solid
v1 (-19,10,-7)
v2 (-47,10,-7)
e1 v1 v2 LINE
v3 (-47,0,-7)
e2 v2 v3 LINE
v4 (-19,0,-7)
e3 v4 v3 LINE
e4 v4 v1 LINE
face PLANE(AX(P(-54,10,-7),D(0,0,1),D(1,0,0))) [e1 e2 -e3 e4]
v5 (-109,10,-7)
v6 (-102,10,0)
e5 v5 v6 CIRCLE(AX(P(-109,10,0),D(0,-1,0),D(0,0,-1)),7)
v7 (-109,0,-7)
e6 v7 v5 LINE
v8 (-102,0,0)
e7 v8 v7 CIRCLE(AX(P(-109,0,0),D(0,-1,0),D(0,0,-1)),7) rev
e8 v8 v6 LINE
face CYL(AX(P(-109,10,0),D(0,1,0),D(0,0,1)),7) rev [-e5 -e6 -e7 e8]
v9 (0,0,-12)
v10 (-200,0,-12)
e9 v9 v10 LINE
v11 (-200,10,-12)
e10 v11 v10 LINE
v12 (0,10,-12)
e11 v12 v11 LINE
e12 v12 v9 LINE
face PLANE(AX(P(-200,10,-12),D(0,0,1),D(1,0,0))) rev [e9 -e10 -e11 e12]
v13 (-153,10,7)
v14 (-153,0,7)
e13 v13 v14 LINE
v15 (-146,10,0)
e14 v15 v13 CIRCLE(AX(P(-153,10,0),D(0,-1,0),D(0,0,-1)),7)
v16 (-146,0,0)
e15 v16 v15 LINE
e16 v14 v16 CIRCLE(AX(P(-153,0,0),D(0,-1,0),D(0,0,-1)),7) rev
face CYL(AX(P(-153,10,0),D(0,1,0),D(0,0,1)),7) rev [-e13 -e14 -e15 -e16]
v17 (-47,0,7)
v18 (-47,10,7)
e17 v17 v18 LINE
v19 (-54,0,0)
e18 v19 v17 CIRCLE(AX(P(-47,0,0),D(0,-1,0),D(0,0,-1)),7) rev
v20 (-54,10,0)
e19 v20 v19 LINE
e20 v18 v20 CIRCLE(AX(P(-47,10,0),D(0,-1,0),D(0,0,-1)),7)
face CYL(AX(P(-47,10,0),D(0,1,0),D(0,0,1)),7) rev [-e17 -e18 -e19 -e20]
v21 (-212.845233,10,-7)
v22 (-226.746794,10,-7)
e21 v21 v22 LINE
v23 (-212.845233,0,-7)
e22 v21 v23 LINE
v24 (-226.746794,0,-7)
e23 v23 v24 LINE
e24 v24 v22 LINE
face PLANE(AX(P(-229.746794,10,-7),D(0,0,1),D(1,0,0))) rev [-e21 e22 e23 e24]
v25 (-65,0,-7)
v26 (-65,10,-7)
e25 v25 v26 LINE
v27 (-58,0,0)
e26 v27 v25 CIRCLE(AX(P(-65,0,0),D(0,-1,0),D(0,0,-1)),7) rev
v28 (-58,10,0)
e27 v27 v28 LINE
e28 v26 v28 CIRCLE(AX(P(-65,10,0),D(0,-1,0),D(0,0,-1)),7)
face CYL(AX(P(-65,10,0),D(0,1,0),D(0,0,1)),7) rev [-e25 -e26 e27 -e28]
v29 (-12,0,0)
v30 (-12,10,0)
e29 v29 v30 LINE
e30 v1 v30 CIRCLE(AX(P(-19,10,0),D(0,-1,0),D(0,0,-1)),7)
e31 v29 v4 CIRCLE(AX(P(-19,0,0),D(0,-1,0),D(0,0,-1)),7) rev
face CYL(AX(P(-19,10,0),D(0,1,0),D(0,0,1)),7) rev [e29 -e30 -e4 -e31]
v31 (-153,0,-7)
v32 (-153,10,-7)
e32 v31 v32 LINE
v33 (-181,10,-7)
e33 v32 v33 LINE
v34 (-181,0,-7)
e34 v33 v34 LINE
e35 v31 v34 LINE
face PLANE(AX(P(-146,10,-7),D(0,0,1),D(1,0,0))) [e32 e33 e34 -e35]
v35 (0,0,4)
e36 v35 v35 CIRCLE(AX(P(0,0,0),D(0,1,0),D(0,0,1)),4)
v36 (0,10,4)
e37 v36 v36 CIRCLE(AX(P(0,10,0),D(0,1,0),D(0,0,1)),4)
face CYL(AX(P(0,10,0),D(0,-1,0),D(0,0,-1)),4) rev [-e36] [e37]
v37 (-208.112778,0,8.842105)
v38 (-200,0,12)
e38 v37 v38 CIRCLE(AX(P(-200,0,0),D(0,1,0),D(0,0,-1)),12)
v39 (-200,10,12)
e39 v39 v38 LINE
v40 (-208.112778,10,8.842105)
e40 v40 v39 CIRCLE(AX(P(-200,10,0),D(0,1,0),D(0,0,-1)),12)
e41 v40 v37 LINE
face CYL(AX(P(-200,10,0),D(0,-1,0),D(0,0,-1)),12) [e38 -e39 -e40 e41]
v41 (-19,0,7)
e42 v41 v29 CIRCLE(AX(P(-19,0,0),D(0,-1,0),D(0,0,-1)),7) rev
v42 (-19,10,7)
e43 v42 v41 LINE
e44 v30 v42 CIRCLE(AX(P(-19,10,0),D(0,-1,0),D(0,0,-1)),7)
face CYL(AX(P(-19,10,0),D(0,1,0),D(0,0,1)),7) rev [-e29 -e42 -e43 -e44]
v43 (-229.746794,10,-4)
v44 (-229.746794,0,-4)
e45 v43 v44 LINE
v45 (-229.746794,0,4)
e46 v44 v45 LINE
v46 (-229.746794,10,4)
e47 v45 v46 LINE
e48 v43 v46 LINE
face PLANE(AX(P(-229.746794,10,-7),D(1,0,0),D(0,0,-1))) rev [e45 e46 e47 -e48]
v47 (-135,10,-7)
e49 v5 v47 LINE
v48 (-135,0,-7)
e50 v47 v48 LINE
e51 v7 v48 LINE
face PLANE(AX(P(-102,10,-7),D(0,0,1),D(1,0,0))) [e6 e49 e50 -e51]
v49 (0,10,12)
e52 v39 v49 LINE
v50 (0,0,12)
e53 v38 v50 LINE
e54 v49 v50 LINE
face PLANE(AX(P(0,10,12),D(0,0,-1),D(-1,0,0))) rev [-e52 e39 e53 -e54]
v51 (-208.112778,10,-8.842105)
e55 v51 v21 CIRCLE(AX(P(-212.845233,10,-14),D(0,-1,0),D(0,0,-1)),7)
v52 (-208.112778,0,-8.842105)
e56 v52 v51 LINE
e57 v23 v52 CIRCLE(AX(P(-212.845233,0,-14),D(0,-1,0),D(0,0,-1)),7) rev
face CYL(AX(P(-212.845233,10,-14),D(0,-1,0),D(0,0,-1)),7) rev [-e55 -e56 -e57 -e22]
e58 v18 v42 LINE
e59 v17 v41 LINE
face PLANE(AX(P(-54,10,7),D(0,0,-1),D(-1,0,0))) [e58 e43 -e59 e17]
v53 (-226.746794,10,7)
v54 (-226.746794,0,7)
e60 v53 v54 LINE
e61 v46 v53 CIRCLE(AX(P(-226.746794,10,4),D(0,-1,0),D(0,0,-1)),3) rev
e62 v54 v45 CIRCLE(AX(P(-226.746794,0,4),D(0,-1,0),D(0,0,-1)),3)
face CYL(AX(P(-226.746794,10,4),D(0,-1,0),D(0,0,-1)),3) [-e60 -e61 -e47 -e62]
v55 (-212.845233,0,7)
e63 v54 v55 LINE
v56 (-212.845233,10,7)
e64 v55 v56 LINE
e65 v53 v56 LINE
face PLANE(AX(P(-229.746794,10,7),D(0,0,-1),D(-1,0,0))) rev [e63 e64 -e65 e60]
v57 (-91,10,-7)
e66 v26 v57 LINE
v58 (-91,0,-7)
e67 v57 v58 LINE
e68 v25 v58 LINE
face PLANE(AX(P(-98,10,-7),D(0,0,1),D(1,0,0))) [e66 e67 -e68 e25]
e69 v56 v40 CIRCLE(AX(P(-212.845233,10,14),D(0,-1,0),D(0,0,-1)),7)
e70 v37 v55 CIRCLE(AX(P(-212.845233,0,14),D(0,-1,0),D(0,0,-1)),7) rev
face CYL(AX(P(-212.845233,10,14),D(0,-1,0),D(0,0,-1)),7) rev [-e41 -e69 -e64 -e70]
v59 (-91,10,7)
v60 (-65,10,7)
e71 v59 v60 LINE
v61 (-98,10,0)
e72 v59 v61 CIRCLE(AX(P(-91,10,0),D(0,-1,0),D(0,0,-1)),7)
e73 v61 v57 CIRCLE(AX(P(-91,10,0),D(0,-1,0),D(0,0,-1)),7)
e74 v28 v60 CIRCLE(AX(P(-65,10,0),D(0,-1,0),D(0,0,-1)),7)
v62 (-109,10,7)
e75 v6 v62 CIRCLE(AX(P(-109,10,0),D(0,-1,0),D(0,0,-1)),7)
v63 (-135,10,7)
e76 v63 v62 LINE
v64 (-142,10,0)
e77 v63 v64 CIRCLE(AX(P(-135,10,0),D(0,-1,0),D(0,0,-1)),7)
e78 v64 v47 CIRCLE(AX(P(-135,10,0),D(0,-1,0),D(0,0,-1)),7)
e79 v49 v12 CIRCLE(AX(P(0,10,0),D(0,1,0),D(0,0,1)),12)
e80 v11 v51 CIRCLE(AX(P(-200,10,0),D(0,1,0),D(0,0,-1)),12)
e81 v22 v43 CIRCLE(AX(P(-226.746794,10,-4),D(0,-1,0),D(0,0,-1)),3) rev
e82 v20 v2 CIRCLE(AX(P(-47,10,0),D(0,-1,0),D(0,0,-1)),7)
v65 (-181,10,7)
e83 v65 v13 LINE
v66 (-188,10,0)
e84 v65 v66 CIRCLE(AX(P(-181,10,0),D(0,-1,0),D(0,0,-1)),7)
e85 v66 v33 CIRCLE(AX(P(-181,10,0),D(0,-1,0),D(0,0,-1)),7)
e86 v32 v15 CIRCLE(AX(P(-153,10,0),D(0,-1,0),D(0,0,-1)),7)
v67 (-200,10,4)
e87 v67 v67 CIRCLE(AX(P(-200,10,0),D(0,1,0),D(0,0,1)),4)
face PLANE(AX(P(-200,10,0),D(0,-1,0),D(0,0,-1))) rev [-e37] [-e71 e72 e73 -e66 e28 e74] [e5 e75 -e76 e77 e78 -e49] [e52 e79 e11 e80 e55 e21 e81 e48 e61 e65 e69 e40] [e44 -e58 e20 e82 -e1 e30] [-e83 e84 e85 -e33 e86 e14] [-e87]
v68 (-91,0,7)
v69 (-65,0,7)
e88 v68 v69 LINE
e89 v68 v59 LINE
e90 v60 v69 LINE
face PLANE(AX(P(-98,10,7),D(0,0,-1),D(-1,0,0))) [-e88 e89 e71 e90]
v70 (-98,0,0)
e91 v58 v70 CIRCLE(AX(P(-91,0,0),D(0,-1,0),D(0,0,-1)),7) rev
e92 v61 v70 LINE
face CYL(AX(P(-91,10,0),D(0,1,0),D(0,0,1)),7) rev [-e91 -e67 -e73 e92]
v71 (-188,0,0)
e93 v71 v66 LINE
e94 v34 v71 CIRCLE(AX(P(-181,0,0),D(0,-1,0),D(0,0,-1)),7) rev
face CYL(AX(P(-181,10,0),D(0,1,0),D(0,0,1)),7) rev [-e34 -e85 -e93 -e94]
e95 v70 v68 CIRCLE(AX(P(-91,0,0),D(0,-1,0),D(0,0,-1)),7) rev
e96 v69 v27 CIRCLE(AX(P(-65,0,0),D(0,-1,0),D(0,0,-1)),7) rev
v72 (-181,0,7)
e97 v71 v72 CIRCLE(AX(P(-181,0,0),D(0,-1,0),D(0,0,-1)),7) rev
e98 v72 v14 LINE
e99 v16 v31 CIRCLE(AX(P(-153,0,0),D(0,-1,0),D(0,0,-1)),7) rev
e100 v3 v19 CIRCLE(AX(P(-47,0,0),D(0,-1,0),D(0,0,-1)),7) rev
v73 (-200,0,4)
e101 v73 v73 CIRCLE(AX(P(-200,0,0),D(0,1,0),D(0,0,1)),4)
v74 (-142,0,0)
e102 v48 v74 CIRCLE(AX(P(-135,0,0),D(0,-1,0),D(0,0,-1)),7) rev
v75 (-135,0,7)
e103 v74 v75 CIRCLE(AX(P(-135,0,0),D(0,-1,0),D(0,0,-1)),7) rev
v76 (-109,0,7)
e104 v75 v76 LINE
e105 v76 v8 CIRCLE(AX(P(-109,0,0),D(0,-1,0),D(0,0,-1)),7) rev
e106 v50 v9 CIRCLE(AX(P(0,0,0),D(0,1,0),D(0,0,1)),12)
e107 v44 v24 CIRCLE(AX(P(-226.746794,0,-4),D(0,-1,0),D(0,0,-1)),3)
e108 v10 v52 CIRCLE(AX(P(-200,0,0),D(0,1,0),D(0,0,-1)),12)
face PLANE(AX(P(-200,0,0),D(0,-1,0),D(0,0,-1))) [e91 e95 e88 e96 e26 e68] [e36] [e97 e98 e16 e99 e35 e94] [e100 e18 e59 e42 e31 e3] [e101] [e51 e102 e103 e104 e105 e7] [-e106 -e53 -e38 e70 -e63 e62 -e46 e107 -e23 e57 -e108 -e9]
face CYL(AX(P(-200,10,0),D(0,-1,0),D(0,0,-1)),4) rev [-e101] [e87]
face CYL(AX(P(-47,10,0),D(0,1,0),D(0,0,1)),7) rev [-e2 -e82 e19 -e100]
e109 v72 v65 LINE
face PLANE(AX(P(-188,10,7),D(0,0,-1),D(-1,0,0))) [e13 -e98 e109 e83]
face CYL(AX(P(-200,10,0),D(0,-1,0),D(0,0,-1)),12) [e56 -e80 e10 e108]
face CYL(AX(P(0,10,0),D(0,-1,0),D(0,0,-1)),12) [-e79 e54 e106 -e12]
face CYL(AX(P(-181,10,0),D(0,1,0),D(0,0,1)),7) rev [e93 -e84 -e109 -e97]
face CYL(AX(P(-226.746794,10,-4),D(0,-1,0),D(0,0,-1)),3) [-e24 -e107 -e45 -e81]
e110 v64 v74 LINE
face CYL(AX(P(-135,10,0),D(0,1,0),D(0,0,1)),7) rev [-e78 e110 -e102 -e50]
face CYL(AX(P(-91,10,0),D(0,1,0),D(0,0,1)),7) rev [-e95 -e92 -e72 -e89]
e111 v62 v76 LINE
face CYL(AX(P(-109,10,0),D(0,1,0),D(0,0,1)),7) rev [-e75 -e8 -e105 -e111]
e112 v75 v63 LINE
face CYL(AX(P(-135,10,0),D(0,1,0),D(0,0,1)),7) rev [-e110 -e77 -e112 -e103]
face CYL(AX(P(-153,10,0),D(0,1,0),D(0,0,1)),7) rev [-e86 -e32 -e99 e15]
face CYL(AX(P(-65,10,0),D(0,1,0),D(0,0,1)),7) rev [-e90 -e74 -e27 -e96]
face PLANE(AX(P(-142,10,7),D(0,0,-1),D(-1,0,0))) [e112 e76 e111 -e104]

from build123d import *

# Parameters (mm, degrees)
SKETCH1_R           = 4
SKETCH1_W           = 42
SKETCH1_H           = 14
SKETCH1_W_2         = 40
BOSS_EXTRUDE1_DEPTH = 10
FILLET1_R           = 7
FILLET2_R           = 3


with BuildPart() as part:
    # Sketch1 → Boss-Extrude1 (new body)
    with BuildSketch(Plane(origin=(0, 0, 0), x_dir=(1, 0, 0), z_dir=(0, 1, 0))):
        with BuildLine():
            Line((-200, 12), (0, 12))
            ThreePointArc((0, 12), (12, 0), (0, -12))
            Line((0, -12), (-200, -12))
            ThreePointArc((-200, -12), (-205.477225575, -10.677078252), (-209.746794345, -7))
            Line((-209.746794345, -7), (-229.746794345, -7))
            Line((-229.746794345, -7), (-229.746794345, 7))
            Line((-229.746794345, 7), (-209.746794345, 7))
            ThreePointArc((-209.746794345, 7), (-205.477225575, 10.677078252), (-200, 12))
        make_face()
        with Locations(Location((-200, 0, 0), (0, 0, 270))):
            Circle(SKETCH1_R, mode=Mode.SUBTRACT)
        with Locations(Location((0, 0, 0), (0, 0, 270))):
            Circle(SKETCH1_R, mode=Mode.SUBTRACT)
        with Locations((-167, 0)):
            Rectangle(SKETCH1_W, SKETCH1_H, mode=Mode.SUBTRACT)
        with Locations((-122, 0)):
            Rectangle(SKETCH1_W_2, SKETCH1_H, mode=Mode.SUBTRACT)
        with Locations((-78, 0)):
            Rectangle(SKETCH1_W_2, SKETCH1_H, mode=Mode.SUBTRACT)
        with Locations((-33, 0)):
            Rectangle(SKETCH1_W, SKETCH1_H, mode=Mode.SUBTRACT)
    extrude(amount=BOSS_EXTRUDE1_DEPTH)

    # Fillet1
    fillet1_edges = [part.edges().sort_by_distance(p)[0] for p in [
        (-142, 5, -7),
        (-98, 5, -7),
        (-54, 5, -7),
        (-58, 5, -7),
        (-12, 5, -7),
        (-102, 5, -7),
        (-146, 5, -7),
        (-146, 5, 7),
        (-102, 5, 7),
        (-58, 5, 7),
        (-12, 5, 7),
        (-54, 5, 7),
        (-98, 5, 7),
        (-142, 5, 7),
        (-188, 5, 7),
        (-188, 5, -7),
        (-209.746794345, 5, 7),
        (-209.746794345, 5, -7),
    ]]
    fillet(fillet1_edges, radius=FILLET1_R - 0.0001)  # a hair under: the kernel refuses the full size

    # Fillet2
    fillet2_edges = [part.edges().sort_by_distance(p)[0] for p in [
        (-229.746794345, 5, 7),
        (-229.746794345, 5, -7),
    ]]
    fillet(fillet2_edges, radius=FILLET2_R)


solid = part.part
